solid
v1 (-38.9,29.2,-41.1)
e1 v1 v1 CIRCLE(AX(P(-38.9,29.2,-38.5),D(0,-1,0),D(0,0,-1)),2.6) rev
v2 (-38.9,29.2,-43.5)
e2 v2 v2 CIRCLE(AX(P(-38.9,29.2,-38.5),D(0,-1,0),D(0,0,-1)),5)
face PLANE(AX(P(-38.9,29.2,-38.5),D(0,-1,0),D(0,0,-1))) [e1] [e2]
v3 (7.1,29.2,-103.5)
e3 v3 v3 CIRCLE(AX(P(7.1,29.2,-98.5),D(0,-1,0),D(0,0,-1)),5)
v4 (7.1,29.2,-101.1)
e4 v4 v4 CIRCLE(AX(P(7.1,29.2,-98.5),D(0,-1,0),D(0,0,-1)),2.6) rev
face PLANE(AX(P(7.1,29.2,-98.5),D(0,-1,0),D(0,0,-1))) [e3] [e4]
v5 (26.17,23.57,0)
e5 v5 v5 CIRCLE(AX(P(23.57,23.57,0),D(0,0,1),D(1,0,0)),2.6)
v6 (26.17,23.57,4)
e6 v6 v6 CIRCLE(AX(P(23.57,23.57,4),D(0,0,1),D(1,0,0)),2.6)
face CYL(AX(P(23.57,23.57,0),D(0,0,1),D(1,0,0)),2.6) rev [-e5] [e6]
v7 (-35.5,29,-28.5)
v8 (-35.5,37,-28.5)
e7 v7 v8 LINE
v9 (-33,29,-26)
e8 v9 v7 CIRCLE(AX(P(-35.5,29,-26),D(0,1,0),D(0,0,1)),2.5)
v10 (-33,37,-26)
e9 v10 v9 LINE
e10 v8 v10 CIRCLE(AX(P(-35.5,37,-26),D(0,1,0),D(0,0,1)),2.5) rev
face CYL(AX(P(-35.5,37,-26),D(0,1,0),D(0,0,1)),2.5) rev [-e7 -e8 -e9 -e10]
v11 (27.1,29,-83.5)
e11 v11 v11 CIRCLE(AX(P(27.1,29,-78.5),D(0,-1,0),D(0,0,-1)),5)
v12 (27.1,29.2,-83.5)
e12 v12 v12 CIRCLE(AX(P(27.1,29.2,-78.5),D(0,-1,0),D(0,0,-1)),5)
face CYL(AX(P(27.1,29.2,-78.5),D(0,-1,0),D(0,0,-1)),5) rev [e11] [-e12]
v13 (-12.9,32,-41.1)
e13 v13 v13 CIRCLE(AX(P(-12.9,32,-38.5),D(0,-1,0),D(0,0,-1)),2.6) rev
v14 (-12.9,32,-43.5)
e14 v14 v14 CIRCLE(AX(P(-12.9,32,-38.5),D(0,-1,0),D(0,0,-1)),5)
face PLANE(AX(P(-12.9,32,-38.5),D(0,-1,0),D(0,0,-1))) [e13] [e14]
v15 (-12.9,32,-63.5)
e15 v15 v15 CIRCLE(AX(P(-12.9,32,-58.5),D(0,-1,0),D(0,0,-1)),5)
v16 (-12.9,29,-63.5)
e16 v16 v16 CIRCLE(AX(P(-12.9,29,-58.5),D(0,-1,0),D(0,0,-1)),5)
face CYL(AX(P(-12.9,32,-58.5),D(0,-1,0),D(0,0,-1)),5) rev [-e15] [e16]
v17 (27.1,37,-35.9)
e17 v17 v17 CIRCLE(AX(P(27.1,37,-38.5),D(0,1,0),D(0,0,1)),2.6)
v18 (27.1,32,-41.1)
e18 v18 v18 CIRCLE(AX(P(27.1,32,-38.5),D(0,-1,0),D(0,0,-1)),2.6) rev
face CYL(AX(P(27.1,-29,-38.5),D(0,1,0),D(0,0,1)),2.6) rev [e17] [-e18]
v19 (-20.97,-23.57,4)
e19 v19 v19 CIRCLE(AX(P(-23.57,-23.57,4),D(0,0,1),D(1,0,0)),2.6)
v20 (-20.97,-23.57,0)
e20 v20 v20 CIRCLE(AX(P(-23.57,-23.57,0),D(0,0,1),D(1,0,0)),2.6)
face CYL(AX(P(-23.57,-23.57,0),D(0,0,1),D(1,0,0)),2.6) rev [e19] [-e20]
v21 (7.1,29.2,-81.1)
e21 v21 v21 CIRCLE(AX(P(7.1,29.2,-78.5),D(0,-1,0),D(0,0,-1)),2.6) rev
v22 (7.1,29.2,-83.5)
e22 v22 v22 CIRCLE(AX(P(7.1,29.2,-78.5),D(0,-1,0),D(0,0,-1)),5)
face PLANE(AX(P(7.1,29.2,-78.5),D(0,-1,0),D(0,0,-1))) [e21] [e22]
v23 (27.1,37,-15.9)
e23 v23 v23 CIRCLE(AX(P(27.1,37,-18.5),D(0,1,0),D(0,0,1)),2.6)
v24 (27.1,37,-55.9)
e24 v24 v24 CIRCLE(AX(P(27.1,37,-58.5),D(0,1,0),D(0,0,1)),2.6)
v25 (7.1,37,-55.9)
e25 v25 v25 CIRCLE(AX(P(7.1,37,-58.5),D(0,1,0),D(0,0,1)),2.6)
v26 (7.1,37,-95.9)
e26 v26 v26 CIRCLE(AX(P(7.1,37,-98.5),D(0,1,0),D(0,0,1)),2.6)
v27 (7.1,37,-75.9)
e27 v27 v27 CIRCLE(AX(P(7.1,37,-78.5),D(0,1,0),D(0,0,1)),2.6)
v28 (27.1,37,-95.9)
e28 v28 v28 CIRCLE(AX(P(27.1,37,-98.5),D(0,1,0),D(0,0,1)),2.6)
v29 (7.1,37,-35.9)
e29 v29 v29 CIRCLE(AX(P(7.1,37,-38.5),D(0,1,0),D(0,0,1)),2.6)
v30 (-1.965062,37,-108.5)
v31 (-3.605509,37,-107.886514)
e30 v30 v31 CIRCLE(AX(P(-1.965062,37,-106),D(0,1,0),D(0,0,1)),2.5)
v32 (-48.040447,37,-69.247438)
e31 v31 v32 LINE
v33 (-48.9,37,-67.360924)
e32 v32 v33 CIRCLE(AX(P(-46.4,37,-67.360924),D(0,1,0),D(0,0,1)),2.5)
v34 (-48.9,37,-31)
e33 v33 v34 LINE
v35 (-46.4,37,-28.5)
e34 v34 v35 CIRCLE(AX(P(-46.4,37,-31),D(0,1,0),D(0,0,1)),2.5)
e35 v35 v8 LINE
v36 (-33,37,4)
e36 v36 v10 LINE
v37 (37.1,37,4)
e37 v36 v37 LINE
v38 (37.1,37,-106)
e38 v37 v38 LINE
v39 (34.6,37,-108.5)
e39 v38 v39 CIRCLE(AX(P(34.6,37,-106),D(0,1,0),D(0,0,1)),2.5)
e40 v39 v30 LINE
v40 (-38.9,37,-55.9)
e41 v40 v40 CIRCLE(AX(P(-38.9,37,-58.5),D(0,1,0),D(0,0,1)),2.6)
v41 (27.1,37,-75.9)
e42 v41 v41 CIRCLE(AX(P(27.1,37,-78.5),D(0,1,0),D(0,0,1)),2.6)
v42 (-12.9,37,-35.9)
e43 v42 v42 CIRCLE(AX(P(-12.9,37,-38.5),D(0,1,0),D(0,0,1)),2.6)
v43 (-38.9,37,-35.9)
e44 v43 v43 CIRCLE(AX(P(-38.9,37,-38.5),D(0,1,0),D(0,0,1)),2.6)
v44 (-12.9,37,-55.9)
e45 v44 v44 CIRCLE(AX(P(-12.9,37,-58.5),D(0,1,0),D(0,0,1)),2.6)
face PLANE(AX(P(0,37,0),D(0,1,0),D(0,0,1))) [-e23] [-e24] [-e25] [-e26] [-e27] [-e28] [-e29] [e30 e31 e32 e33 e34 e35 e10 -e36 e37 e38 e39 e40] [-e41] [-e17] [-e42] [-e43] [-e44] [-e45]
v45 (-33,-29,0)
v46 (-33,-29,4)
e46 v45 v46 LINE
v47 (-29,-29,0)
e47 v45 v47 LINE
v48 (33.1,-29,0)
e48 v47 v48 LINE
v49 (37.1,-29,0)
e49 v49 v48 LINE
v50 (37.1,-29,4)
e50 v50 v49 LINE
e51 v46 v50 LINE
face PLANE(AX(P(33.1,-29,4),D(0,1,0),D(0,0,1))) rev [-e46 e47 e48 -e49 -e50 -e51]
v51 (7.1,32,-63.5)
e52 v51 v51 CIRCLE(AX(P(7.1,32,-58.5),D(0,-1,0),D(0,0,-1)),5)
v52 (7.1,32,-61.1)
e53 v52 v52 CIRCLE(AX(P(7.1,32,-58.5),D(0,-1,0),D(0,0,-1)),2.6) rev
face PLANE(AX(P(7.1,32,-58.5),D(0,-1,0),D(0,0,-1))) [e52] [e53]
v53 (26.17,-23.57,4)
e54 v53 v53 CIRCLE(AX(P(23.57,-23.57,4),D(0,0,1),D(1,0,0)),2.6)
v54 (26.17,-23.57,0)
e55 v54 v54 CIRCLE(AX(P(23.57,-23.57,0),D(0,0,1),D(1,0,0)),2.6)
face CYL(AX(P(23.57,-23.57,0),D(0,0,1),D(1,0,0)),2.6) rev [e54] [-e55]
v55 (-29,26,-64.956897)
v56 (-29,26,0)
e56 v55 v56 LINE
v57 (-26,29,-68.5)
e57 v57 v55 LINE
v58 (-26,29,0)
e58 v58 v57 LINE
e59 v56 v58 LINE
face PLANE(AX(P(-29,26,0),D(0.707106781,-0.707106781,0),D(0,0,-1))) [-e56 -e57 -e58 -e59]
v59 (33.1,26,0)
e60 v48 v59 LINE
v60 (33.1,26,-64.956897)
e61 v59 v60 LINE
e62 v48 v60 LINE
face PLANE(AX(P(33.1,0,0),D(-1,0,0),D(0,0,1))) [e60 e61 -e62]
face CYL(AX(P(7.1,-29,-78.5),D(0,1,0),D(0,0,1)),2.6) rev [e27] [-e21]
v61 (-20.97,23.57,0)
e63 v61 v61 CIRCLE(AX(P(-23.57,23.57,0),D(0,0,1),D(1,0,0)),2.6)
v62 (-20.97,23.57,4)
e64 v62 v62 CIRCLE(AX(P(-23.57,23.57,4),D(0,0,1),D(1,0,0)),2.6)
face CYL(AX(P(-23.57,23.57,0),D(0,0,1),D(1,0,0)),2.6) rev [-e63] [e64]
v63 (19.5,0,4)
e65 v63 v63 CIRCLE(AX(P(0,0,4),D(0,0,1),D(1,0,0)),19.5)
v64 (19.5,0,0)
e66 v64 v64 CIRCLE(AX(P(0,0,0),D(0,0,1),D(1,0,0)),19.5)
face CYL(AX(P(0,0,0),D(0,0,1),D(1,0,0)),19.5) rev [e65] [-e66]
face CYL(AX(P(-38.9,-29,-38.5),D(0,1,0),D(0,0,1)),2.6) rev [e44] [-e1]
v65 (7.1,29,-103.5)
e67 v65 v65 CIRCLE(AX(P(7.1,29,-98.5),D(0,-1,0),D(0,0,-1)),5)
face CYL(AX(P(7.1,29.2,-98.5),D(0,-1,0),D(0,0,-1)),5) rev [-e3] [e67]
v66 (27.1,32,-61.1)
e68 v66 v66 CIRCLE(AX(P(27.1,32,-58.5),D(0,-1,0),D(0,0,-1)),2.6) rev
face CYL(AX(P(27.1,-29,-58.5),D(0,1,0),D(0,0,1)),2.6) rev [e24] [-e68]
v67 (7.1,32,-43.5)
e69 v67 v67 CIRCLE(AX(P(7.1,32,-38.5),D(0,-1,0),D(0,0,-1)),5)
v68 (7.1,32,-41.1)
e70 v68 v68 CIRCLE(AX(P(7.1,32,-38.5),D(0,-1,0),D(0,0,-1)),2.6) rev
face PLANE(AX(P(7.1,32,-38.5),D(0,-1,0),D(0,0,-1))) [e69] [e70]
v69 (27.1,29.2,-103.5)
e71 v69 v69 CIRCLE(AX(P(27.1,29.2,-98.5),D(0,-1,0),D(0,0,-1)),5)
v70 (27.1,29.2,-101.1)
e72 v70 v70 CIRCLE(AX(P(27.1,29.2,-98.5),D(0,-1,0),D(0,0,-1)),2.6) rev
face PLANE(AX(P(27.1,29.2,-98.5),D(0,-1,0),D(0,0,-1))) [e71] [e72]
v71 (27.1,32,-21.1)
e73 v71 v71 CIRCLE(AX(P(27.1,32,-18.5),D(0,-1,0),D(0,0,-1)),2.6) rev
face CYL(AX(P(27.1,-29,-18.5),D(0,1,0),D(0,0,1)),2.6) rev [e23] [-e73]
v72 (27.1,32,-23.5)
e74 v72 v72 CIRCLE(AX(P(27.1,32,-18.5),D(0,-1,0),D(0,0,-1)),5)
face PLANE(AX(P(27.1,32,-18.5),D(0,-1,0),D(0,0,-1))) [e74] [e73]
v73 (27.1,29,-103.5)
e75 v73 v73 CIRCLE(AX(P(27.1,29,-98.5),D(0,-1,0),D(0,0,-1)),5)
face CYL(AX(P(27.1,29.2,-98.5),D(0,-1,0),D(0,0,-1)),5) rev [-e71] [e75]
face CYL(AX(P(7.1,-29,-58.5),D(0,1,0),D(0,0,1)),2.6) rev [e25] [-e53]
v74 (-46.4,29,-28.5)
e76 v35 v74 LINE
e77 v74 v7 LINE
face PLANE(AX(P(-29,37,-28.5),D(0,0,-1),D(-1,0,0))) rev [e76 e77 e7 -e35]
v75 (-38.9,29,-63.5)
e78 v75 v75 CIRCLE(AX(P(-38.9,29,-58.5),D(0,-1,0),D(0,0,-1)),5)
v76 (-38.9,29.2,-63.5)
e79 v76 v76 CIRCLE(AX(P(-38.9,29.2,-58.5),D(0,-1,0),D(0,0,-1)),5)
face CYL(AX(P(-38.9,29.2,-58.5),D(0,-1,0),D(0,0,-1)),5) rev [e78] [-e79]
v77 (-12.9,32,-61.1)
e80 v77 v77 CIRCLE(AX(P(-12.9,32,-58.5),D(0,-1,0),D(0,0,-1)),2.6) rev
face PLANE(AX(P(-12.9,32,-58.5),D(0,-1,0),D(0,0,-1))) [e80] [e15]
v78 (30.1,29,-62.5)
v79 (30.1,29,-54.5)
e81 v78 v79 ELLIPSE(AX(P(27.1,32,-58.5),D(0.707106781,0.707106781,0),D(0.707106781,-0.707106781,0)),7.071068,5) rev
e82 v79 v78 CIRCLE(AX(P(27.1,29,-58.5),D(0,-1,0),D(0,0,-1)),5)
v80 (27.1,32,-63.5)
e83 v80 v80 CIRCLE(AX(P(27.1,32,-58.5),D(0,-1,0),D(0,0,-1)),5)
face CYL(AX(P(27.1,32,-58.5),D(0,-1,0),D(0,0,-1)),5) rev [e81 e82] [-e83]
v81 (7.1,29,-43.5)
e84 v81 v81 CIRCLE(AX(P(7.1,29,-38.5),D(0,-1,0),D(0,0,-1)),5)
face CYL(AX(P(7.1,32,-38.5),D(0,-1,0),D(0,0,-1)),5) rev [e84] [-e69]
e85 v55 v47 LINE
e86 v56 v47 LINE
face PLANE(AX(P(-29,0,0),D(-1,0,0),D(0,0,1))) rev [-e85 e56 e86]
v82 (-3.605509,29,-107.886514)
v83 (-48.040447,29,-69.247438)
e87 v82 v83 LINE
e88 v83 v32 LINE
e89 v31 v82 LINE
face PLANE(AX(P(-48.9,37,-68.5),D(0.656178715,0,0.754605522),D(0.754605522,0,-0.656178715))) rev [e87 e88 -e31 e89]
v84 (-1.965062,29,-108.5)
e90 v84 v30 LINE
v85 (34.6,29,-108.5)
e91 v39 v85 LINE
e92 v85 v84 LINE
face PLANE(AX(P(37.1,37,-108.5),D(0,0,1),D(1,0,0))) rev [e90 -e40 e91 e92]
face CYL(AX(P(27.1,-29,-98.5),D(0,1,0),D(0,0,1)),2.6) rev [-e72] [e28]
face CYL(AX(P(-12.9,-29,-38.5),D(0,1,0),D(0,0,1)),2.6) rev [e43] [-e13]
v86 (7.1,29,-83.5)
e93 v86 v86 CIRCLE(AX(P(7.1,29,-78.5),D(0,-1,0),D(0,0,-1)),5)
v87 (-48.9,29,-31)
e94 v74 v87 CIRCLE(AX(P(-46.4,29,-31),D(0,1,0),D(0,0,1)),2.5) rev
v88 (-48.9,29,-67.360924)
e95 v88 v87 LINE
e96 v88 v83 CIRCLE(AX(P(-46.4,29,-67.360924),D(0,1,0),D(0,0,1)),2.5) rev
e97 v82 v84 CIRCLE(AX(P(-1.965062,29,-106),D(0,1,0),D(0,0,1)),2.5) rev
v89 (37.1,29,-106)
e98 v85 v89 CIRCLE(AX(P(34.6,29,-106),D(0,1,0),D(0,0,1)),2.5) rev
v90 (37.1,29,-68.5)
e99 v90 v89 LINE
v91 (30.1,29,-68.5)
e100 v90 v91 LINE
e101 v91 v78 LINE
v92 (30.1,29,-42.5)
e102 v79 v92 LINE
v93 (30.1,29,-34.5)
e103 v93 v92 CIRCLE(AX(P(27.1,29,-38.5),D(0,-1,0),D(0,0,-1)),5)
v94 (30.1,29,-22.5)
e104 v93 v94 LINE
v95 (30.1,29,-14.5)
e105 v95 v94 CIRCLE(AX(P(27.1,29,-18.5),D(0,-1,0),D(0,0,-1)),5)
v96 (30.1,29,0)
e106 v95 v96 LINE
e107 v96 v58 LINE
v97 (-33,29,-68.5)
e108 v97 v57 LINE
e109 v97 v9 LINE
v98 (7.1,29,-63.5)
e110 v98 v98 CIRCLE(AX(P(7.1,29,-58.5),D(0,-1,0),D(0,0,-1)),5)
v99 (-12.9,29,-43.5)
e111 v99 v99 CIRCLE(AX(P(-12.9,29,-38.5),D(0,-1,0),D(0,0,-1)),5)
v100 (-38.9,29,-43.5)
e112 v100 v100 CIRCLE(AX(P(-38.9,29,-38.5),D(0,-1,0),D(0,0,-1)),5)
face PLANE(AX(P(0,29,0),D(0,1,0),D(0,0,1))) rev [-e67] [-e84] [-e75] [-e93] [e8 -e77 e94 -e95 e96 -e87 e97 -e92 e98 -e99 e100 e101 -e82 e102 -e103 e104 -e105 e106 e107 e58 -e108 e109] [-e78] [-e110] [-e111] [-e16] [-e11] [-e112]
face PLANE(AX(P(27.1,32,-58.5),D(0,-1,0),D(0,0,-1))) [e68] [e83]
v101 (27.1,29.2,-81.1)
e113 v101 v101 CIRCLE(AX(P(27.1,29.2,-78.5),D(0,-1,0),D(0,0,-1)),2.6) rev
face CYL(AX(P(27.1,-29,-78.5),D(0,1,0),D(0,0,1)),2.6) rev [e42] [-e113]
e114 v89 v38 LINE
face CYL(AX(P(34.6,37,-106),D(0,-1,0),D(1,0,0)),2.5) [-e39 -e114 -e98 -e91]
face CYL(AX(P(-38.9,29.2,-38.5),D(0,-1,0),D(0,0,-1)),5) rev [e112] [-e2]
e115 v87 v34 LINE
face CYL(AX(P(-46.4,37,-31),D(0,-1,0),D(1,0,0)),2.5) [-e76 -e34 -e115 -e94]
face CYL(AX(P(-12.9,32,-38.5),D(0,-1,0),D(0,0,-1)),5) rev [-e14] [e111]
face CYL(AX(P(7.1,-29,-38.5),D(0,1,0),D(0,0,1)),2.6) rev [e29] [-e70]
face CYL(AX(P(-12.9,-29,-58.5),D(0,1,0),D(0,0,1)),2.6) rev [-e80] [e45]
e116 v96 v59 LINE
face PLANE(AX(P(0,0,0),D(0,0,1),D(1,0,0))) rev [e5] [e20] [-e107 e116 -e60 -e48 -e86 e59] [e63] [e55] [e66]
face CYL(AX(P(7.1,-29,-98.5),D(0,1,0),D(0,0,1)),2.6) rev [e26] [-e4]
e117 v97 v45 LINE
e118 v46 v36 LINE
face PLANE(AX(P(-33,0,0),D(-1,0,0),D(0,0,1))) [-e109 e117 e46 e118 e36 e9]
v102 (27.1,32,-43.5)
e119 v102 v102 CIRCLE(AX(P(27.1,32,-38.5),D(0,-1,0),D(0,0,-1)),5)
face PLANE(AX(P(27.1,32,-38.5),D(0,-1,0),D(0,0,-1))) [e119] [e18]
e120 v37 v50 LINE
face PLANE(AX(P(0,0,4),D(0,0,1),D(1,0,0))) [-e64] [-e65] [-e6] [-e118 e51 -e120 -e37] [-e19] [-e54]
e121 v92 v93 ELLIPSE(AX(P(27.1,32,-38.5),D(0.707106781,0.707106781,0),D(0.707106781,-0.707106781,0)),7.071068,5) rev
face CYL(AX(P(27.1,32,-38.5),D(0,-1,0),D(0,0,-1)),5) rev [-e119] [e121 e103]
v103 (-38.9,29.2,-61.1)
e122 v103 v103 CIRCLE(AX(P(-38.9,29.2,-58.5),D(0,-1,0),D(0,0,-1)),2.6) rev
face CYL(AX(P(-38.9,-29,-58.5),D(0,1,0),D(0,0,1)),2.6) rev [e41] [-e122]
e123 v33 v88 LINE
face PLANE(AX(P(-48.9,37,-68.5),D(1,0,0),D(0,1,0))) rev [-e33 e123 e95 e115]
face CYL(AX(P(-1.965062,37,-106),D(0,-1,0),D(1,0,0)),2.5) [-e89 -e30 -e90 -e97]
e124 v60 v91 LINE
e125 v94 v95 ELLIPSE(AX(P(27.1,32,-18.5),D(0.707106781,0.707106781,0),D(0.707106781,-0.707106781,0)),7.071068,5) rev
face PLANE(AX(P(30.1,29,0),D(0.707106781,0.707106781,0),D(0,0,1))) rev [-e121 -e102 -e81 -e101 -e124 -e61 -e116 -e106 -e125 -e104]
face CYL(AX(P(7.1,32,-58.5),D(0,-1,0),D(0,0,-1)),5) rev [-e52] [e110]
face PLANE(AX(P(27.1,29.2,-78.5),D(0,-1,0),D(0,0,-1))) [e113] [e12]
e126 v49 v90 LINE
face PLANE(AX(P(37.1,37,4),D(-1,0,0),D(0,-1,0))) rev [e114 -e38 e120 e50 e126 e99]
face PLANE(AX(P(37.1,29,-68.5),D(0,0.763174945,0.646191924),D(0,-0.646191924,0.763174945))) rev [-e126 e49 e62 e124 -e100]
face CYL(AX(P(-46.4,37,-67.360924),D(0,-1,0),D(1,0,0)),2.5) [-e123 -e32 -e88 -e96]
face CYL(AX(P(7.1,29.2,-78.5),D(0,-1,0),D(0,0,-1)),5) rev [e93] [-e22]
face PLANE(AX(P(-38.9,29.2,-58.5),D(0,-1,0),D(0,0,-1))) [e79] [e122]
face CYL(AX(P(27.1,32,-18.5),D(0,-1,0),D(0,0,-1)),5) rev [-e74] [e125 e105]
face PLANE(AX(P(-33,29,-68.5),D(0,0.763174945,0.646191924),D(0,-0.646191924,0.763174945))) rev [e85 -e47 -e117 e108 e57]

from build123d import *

# Parameters (mm, degrees)
EXTRUDE_1_DEPTH     = 4
SKETCH_6_R          = 19.5
SKETCH_6_R_2        = 2.6
CUT_EXTRUDE_1_DEPTH = 45.18834688
EXTRUDE_2_DEPTH     = 8
EXTRUDE_3_DEPTH     = 4
EXTRUDE_4_DEPTH     = 4
SKETCH_8_R          = 2.6
CUT_EXTRUDE_2_DEPTH = 137.086222668
SKETCH_12_R         = 5
CUT_EXTRUDE_3_DEPTH = 3
SKETCH_13_R         = 5
CUT_EXTRUDE_4_DEPTH = 0.2
FILLET_1_R          = 2.5
CHAMFER_2_SIZE      = 3


with BuildPart() as part:
    # Эскиз1 → Бобышка-Вытянуть1 (new body)
    with BuildSketch(Plane.XY):
        Polygon((-29, 29), (29, 29), (33.1, 29), (33.1, -29), (29, -29), (-29, -29), align=None)
    extrude(amount=EXTRUDE_1_DEPTH)

    # Эскиз6 → Вырез-Вытянуть1 (cut, through all)
    with BuildSketch(Plane.XY.offset(4)):
        Circle(SKETCH_6_R)
        with Locations((-23.57, 23.57)):
            Circle(SKETCH_6_R_2)
        with Locations((23.57, 23.57)):
            Circle(SKETCH_6_R_2)
        with Locations((-23.57, -23.57)):
            Circle(SKETCH_6_R_2)
        with Locations((23.57, -23.57)):
            Circle(SKETCH_6_R_2)
    extrude(amount=-CUT_EXTRUDE_1_DEPTH, mode=Mode.SUBTRACT)

    # Эскиз3 → Бобышка-Вытянуть2 (add)
    with BuildSketch(Plane(origin=(0, 29, 0), x_dir=(1, 0, 0), z_dir=(0, 1, 0))):
        Polygon((-29, -4), (37.1, -4), (37.1, 108.5), (-2.9, 108.5), (-48.9, 68.5), (-48.9, 28.5), (-29, 28.5), align=None)
    extrude(amount=EXTRUDE_2_DEPTH)

    # Эскиз5 → Бобышка-Вытянуть3 (add)
    with BuildSketch(Plane(origin=(33.1, 0, 0), x_dir=(0, 0, -1), z_dir=(1, 0, 0))):
        Polygon((-4, -29), (-4, 37), (68.5, 37), (68.5, 29), (0, -29), align=None)
    extrude(amount=EXTRUDE_3_DEPTH)

    # Эскиз10 → Бобышка-Вытянуть4 (add)
    with BuildSketch(Plane.ZY.offset(29)):
        Polygon((4, -29), (0, -29), (-68.5, 29), (-68.5, 37), (4, 37), align=None)
    extrude(amount=EXTRUDE_4_DEPTH)

    # Эскиз8 → Вырез-Вытянуть2 (cut, through all)
    with BuildSketch(Plane(origin=(0, 37, 0), x_dir=(1, 0, 0), z_dir=(0, 1, 0))):
        with Locations(Location((27.1, 38.5, 0), (0, 0, 270))):
            Circle(SKETCH_8_R)
        with Locations(Location((7.1, 38.5, 0), (0, 0, 270))):
            Circle(SKETCH_8_R)
        with Locations(Location((7.1, 58.5, 0), (0, 0, 270))):
            Circle(SKETCH_8_R)
        with Locations(Location((7.1, 78.5, 0), (0, 0, 270))):
            Circle(SKETCH_8_R)
        with Locations(Location((7.1, 98.5, 0), (0, 0, 270))):
            Circle(SKETCH_8_R)
        with Locations(Location((27.1, 58.5, 0), (0, 0, 270))):
            Circle(SKETCH_8_R)
        with Locations(Location((27.1, 78.5, 0), (0, 0, 270))):
            Circle(SKETCH_8_R)
        with Locations(Location((27.1, 98.5, 0), (0, 0, 270))):
            Circle(SKETCH_8_R)
        with Locations(Location((-12.9, 58.5, 0), (0, 0, 270))):
            Circle(SKETCH_8_R)
        with Locations(Location((-12.9, 38.5, 0), (0, 0, 270))):
            Circle(SKETCH_8_R)
        with Locations(Location((-38.9, 58.5, 0), (0, 0, 270))):
            Circle(SKETCH_8_R)
        with Locations(Location((-38.9, 38.5, 0), (0, 0, 270))):
            Circle(SKETCH_8_R)
        with Locations(Location((27.1, 18.5, 0), (0, 0, 270))):
            Circle(SKETCH_8_R)
    extrude(amount=-CUT_EXTRUDE_2_DEPTH, mode=Mode.SUBTRACT)

    # Эскиз12 → Вырез-Вытянуть3 (cut)
    with BuildSketch(Plane.XZ.offset(-29)):
        with Locations(Location((27.1, -38.5, 0), (0, 0, 270))):
            Circle(SKETCH_12_R)
        with Locations(Location((7.1, -38.5, 0), (0, 0, 270))):
            Circle(SKETCH_12_R)
        with Locations(Location((-12.9, -38.5, 0), (0, 0, 270))):
            Circle(SKETCH_12_R)
        with Locations(Location((7.1, -58.5, 0), (0, 0, 270))):
            Circle(SKETCH_12_R)
        with Locations(Location((-12.9, -58.5, 0), (0, 0, 270))):
            Circle(SKETCH_12_R)
        with Locations(Location((27.1, -58.5, 0), (0, 0, 270))):
            Circle(SKETCH_12_R)
        with Locations(Location((27.1, -18.5, 0), (0, 0, 270))):
            Circle(SKETCH_12_R)
    extrude(amount=-CUT_EXTRUDE_3_DEPTH, mode=Mode.SUBTRACT)

    # Эскиз13 → Вырез-Вытянуть4 (cut)
    with BuildSketch(Plane.XZ.offset(-29)):
        with Locations(Location((-38.9, -38.5, 0), (0, 0, 270))):
            Circle(SKETCH_13_R)
        with Locations(Location((-38.9, -58.5, 0), (0, 0, 270))):
            Circle(SKETCH_13_R)
        with Locations(Location((27.1, -78.5, 0), (0, 0, 270))):
            Circle(SKETCH_13_R)
        with Locations(Location((7.1, -78.5, 0), (0, 0, 270))):
            Circle(SKETCH_13_R)
        with Locations(Location((7.1, -98.5, 0), (0, 0, 270))):
            Circle(SKETCH_13_R)
        with Locations(Location((27.1, -98.5, 0), (0, 0, 270))):
            Circle(SKETCH_13_R)
    extrude(amount=-CUT_EXTRUDE_4_DEPTH, mode=Mode.SUBTRACT)

    # Скругление1
    fillet_1_edges = [part.edges().sort_by_distance(p)[0] for p in [
        (37.1, 33, -108.5),
        (-2.9, 33, -108.5),
        (-48.9, 33, -68.5),
        (-48.9, 33, -28.5),
        (-33, 33, -28.5),
    ]]
    fillet(fillet_1_edges, radius=FILLET_1_R)

    # Фаска2
    # the kernel refuses this chamfer: 3 mm, written as the material it adds along each edge
    with BuildSketch(Plane(origin=(-29, 29, 0), x_dir=(-0.027495876610586768, -0.9996219169112968, 0), z_dir=(0, 0, -1))) as chamfer_2_piece_1_section:
        Polygon((CHAMFER_2_SIZE * 0.999621916911, -CHAMFER_2_SIZE * 0.0274958766106), (-CHAMFER_2_SIZE * 0.0274958766106, -CHAMFER_2_SIZE * 0.999621916911), (0, 0), align=None)
    chamfer_2_piece_1 = extrude(amount=76.215048964, mode=Mode.PRIVATE)
    chamfer_2_piece_1 = split(chamfer_2_piece_1, bisect_by=Plane(origin=(-27.995614035, 11.406791474, -47.721814069), z_dir=(0, 0.7631749451448332, 0.6461919243562093)), keep=Keep.TOP, mode=Mode.PRIVATE)
    add(chamfer_2_piece_1)
    with BuildSketch(Plane(origin=(33.1, 29, -76.215048964), x_dir=(0.027495876610586768, -0.9996219169112968, 0), z_dir=(0, 0, 1))) as chamfer_2_piece_2_section:
        Polygon((CHAMFER_2_SIZE * 0.999621916911, -CHAMFER_2_SIZE * 0.0274958766106), (-CHAMFER_2_SIZE * 0.0274958766106, -CHAMFER_2_SIZE * 0.999621916911), (0, 0), align=None)
    chamfer_2_piece_2 = extrude(amount=76.215048964, mode=Mode.PRIVATE)
    chamfer_2_piece_2 = chamfer_2_piece_2 - Plane(origin=(27.1, 27.967688512, -58.5), x_dir=(0, 0, -1), z_dir=(0, -1, 0)) * Cylinder(5, 165, mode=Mode.PRIVATE)
    chamfer_2_piece_2 = chamfer_2_piece_2 - Plane(origin=(27.1, 27.967688512, -38.5), x_dir=(0, 0, -1), z_dir=(0, -1, 0)) * Cylinder(5, 165, mode=Mode.PRIVATE)
    chamfer_2_piece_2 = chamfer_2_piece_2 - Plane(origin=(27.1, 27.967688512, -18.5), x_dir=(0, 0, -1), z_dir=(0, -1, 0)) * Cylinder(5, 165, mode=Mode.PRIVATE)
    chamfer_2_piece_2 = split(chamfer_2_piece_2, bisect_by=Plane(origin=(32.179087154, 11.152901074, -47.421960751), z_dir=(0, 0.7631749451448332, 0.6461919243562093)), keep=Keep.TOP, mode=Mode.PRIVATE)
    add(chamfer_2_piece_2)


solid = part.part
